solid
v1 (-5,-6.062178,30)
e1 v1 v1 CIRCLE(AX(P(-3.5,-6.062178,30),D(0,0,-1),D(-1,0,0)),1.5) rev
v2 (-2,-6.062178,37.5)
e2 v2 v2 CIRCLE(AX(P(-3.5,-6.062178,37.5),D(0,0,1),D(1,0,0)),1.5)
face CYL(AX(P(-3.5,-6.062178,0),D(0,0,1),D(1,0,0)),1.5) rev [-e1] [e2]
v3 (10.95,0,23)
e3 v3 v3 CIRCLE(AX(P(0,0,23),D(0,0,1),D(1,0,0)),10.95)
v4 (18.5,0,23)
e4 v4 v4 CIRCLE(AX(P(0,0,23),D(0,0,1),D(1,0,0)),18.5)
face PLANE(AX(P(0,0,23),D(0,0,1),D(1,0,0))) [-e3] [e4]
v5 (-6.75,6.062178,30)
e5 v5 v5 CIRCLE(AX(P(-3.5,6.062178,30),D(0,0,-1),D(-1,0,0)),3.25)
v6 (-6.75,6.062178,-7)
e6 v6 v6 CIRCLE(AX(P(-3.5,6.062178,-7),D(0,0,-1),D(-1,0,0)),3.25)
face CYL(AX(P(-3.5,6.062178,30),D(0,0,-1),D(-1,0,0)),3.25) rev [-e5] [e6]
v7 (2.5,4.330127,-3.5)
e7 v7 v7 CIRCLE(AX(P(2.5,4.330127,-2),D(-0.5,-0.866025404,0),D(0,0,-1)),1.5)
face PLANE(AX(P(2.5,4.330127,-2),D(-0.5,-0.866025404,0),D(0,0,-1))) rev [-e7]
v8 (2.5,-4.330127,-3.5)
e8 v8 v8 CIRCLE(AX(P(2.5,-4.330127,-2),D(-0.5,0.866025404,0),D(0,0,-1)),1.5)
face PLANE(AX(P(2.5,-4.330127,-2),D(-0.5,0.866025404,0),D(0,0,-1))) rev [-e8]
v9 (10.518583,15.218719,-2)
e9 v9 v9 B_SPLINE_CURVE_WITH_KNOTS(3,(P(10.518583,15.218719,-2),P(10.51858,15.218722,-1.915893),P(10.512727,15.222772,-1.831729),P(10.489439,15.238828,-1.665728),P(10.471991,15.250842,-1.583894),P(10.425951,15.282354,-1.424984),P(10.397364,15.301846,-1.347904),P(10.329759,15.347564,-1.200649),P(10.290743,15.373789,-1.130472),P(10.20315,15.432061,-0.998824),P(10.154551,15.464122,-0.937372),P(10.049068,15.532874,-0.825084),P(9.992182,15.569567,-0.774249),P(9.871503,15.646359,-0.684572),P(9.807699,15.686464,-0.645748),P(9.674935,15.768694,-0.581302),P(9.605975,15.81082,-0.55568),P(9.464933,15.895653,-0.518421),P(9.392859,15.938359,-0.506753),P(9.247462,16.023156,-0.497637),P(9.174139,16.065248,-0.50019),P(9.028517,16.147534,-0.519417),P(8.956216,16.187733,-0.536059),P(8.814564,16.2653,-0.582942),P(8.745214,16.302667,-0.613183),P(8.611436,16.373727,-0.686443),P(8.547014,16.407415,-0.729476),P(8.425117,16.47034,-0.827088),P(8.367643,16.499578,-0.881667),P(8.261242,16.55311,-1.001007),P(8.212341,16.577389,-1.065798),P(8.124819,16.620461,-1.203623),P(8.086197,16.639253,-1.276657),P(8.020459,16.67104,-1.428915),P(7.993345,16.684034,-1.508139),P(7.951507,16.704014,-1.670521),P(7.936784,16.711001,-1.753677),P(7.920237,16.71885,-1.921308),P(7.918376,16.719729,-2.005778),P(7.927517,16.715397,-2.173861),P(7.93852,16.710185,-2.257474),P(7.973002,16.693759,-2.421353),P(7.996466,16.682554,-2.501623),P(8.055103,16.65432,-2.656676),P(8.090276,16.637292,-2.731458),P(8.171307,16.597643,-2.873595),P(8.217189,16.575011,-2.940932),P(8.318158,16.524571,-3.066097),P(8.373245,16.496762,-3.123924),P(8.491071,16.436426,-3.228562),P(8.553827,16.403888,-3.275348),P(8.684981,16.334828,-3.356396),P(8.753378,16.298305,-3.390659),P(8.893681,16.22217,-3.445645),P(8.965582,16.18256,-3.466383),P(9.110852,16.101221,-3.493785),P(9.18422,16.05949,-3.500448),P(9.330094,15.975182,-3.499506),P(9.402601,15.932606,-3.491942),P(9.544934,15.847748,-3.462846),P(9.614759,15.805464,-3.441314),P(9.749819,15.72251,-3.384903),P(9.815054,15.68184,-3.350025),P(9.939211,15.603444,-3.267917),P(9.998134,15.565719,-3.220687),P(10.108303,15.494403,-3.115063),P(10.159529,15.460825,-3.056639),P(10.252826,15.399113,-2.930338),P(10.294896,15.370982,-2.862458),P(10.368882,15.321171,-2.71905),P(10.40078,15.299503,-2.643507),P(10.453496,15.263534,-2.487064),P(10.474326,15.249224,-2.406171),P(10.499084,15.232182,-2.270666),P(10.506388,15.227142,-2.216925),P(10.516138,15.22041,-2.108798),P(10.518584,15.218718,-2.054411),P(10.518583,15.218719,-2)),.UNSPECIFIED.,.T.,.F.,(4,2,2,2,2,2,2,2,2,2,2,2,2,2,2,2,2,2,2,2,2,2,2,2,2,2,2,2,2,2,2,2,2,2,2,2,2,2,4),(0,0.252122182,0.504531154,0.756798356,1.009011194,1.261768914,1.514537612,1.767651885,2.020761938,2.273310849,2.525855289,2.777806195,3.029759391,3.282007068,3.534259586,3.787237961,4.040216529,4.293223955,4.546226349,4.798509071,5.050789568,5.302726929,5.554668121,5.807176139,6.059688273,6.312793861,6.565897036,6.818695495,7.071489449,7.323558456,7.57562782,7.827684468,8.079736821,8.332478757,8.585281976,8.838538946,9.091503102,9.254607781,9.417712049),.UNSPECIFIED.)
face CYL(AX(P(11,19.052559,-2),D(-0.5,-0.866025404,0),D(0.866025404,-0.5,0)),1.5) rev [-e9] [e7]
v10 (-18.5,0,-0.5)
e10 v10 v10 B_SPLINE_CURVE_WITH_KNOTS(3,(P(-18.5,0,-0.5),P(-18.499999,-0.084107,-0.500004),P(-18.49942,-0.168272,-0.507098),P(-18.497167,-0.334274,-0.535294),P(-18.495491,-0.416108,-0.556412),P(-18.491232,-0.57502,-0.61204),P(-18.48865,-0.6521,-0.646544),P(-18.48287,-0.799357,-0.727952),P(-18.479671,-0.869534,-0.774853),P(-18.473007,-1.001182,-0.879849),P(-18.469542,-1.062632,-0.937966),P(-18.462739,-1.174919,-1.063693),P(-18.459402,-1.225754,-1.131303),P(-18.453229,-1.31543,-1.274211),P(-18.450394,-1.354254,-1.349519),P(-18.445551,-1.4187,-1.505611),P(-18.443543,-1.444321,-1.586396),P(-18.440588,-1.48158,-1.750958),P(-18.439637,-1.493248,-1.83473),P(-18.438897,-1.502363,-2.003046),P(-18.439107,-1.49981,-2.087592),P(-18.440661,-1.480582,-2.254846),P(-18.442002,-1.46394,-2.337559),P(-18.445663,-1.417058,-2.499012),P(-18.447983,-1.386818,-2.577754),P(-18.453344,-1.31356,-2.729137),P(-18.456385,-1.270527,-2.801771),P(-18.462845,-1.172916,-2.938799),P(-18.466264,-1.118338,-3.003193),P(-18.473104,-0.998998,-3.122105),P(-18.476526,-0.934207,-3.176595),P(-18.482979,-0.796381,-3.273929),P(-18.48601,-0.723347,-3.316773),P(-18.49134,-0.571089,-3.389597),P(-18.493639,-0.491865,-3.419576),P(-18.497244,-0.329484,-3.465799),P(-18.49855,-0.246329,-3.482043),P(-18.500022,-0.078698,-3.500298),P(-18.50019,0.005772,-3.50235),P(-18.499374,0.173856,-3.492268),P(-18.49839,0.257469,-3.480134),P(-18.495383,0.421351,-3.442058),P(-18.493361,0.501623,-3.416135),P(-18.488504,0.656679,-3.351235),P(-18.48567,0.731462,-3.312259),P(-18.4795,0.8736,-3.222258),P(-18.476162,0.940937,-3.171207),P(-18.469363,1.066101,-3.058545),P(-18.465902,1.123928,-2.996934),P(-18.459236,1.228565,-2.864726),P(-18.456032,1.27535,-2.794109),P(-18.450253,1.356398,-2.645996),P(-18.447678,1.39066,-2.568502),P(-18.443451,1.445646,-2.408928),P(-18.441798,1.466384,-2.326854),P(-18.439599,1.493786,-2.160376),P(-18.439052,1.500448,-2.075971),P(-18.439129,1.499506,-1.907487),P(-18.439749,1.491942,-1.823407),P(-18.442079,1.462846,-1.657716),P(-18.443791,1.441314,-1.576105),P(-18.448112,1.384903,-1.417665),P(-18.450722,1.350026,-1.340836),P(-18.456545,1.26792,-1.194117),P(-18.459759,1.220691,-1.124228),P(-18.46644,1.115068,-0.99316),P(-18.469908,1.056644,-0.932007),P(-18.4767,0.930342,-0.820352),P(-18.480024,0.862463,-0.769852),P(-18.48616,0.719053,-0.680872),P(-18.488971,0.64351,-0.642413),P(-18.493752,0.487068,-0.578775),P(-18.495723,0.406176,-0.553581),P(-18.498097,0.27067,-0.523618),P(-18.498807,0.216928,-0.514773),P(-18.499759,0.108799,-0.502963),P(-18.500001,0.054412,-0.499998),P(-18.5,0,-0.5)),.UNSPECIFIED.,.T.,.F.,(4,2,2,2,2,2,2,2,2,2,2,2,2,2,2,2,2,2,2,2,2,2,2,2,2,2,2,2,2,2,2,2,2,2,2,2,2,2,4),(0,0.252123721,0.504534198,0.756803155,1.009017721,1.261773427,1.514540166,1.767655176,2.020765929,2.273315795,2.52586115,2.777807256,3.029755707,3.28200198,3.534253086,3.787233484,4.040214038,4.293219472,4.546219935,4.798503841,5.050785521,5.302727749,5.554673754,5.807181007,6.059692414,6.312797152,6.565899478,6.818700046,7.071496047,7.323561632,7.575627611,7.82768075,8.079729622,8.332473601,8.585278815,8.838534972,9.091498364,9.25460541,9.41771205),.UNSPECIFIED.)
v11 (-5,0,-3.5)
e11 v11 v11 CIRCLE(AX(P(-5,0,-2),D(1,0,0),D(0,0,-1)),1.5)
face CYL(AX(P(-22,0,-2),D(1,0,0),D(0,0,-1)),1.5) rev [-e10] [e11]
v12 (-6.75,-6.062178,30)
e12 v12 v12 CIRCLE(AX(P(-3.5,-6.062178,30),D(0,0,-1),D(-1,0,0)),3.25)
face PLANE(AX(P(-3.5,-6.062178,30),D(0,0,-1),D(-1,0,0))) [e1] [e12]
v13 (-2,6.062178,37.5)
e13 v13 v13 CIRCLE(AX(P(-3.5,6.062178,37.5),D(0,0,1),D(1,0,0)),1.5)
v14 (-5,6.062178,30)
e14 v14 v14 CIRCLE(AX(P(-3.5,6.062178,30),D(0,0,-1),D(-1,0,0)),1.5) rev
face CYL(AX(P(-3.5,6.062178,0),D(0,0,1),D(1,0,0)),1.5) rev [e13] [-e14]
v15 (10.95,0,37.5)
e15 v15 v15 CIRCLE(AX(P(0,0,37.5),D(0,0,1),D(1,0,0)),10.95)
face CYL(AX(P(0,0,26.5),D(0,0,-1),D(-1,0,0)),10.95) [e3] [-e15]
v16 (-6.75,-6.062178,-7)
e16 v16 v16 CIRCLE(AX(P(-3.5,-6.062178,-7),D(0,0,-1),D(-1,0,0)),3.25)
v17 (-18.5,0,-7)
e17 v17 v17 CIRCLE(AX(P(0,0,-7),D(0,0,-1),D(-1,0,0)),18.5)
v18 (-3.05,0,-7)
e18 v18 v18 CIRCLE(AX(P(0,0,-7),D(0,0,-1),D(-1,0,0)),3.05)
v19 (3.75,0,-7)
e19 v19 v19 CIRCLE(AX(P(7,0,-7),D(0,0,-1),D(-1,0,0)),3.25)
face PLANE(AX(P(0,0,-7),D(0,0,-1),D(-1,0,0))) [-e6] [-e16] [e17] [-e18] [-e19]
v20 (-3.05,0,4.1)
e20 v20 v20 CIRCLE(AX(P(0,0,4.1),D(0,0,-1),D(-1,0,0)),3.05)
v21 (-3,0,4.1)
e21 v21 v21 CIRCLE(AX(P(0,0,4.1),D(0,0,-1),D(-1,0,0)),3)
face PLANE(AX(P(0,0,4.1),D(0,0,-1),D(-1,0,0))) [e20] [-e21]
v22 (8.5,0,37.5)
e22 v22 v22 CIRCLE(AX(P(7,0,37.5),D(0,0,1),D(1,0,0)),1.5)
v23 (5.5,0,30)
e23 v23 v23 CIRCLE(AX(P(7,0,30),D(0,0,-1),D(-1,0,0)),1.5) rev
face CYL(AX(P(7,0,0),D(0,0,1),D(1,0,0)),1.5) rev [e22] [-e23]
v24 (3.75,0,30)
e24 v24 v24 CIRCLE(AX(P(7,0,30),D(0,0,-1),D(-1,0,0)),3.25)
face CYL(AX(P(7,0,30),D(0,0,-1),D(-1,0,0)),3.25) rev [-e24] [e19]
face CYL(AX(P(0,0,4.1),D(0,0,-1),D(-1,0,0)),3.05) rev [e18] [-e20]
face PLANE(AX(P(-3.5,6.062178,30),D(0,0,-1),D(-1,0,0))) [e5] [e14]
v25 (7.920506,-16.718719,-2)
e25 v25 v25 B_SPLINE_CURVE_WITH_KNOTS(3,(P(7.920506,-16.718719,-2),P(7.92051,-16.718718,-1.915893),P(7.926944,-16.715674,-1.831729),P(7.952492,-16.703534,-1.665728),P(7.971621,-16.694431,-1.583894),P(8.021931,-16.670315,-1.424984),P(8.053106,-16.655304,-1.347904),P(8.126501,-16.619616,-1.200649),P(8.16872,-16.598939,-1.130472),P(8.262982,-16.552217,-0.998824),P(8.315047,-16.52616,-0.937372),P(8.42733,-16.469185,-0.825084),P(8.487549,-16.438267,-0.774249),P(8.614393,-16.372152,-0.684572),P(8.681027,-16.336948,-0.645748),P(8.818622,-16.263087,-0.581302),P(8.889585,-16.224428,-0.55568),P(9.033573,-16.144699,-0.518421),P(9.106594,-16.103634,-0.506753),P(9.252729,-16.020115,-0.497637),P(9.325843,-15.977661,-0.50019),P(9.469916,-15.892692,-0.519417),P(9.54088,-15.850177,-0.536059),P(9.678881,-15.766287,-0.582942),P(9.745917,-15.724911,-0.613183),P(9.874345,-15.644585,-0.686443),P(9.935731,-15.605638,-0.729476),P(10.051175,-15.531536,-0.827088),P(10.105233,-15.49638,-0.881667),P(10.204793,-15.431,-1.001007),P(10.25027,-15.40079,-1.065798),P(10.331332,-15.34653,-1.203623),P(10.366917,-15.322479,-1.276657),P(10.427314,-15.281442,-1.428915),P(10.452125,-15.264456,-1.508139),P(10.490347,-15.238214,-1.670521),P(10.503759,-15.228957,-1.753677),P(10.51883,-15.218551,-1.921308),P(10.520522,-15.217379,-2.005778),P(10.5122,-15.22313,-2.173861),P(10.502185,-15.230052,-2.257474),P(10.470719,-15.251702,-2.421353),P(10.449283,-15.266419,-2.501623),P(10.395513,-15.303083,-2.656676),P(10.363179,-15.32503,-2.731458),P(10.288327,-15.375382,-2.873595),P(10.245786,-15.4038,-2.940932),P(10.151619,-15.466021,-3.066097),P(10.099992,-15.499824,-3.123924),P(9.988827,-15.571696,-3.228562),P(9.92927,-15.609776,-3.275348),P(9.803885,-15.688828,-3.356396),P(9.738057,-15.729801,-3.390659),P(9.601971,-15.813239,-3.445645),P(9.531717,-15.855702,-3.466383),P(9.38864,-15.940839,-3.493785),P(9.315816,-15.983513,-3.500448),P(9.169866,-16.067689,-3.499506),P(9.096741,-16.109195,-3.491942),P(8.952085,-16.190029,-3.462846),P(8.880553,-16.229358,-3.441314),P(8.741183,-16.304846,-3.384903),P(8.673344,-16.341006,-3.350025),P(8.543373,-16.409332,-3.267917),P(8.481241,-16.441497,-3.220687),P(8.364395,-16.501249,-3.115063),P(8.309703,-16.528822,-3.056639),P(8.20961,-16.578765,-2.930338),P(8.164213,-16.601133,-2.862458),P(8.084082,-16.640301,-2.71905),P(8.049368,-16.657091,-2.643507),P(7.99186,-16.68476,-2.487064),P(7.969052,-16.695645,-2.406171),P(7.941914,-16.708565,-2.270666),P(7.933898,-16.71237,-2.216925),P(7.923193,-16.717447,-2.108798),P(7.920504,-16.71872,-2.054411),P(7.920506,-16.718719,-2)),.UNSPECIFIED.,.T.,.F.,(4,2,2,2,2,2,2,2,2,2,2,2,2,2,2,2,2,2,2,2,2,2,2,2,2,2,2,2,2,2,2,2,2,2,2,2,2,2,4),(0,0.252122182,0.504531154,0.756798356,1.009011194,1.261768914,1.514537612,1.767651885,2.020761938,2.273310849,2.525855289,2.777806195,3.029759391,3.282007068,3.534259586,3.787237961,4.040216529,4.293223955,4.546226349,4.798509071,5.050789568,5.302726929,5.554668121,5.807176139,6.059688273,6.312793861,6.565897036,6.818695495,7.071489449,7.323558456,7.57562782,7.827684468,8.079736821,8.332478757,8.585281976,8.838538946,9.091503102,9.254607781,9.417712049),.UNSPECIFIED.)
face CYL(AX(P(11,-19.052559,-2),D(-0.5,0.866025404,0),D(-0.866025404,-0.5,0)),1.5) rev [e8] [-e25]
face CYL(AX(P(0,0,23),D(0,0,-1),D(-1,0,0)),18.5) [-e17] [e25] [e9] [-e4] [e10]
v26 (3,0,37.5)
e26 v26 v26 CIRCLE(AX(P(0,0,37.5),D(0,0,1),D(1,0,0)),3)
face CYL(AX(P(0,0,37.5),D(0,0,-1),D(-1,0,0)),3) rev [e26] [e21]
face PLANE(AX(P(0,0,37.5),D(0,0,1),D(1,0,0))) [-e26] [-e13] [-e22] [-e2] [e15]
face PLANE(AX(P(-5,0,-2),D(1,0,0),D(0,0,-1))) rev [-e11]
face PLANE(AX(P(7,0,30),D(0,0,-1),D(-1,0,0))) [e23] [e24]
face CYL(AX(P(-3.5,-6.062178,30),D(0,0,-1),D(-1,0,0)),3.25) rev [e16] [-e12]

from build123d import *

# Parameters (mm, degrees)
SKETCH1_R           = 18.5
BOSS_EXTRUDE1_DEPTH = 23
SKETCH2_R           = 10.95
BOSS_EXTRUDE2_DEPTH = 3.5
SKETCH4_R           = 3.05
CUT_EXTRUDE1_DEPTH  = 4.1
SKETCH5_R           = 1.5
CUT_EXTRUDE2_DEPTH  = 4
SKETCH7_R           = 10.95
SKETCH7_R_2         = 3
BOSS_EXTRUDE3_DEPTH = 11
SKETCH9_R           = 1.5
CUT_EXTRUDE4_DEPTH  = 46.724719791
SKETCH10_R          = 3
CUT_EXTRUDE5_DEPTH  = 46.724719791
SKETCH11_R          = 3.25
CUT_EXTRUDE8_DEPTH  = 30
BOSS_EXTRUDE4_START = 7
SKETCH12_R          = 18.5
SKETCH12_R_2        = 3.25
SKETCH12_R_3        = 3.05
BOSS_EXTRUDE4_DEPTH = 7
CUT_EXTRUDE9_START  = -5
SKETCH13_R          = 1.5
CUT_EXTRUDE9_DEPTH  = 17
CIRPATTERN1_COUNT   = 3


with BuildPart() as part:
    # Sketch1 → Boss-Extrude1 (new body)
    with BuildSketch(Plane.XY):
        Circle(SKETCH1_R)
    extrude(amount=BOSS_EXTRUDE1_DEPTH)

    # Sketch2 → Boss-Extrude2 (add)
    with BuildSketch(Plane.XY.offset(23)):
        Circle(SKETCH2_R)
    extrude(amount=BOSS_EXTRUDE2_DEPTH)

    # Sketch4 → Cut-Extrude1 (cut)
    with BuildSketch(Plane(origin=(0, 0, 0), x_dir=(-1, 0, 0), z_dir=(0, 0, -1))):
        Circle(SKETCH4_R)
    extrude(amount=-CUT_EXTRUDE1_DEPTH, mode=Mode.SUBTRACT)

    # Sketch5 → Cut-Extrude2 (cut)
    with BuildSketch(Plane(origin=(0, 0, 4.1), x_dir=(-1, 0, 0), z_dir=(0, 0, -1))):
        Circle(SKETCH5_R)
    extrude(amount=-CUT_EXTRUDE2_DEPTH, mode=Mode.SUBTRACT)

    # Sketch7 → Boss-Extrude3 (add)
    with BuildSketch(Plane.XY.offset(26.5)):
        Circle(SKETCH7_R)
        Circle(SKETCH7_R_2, mode=Mode.SUBTRACT)
    extrude(amount=BOSS_EXTRUDE3_DEPTH)

    # Sketch9 → Cut-Extrude4 (cut, through all)
    with BuildSketch(Plane.XY.offset(37.5)):
        with Locations((7, 0)):
            Circle(SKETCH9_R)
        with Locations((-3.5, -6.062177826)):
            Circle(SKETCH9_R)
        with Locations((-3.5, 6.062177826)):
            Circle(SKETCH9_R)
    extrude(amount=-CUT_EXTRUDE4_DEPTH, mode=Mode.SUBTRACT)

    # Sketch10 → Cut-Extrude5 (cut, through all)
    with BuildSketch(Plane.XY.offset(37.5)):
        Circle(SKETCH10_R)
    extrude(amount=-CUT_EXTRUDE5_DEPTH, mode=Mode.SUBTRACT)

    # Sketch11 → Cut-Extrude8 (cut)
    with BuildSketch(Plane(origin=(0, 0, 0), x_dir=(-1, 0, 0), z_dir=(0, 0, -1))):
        with Locations((3.5, -6.062177826)):
            Circle(SKETCH11_R)
        with Locations((3.5, 6.062177826)):
            Circle(SKETCH11_R)
        with Locations((-7, 0)):
            Circle(SKETCH11_R)
    extrude(amount=-CUT_EXTRUDE8_DEPTH, mode=Mode.SUBTRACT)

    # Sketch12 → Boss-Extrude4 (add)
    with BuildSketch(Plane(origin=(0, 0, 0), x_dir=(-1, 0, 0), z_dir=(0, 0, -1)).offset(BOSS_EXTRUDE4_START)):
        Circle(SKETCH12_R)
        with Locations((3.5, 6.062177826)):
            Circle(SKETCH12_R_2, mode=Mode.SUBTRACT)
        with Locations((3.5, -6.062177826)):
            Circle(SKETCH12_R_2, mode=Mode.SUBTRACT)
        with Locations((-7, 0)):
            Circle(SKETCH12_R_2, mode=Mode.SUBTRACT)
        Circle(SKETCH12_R_3, mode=Mode.SUBTRACT)
    extrude(amount=-BOSS_EXTRUDE4_DEPTH)

    # Sketch13 → Cut-Extrude9 (cut)
    with BuildSketch(Plane(origin=(0, 0, 0), x_dir=(0, 0, -1), z_dir=(1, 0, 0)).offset(CUT_EXTRUDE9_START)):
        with Locations((2, 0)):
            Circle(SKETCH13_R)
    cut_extrude9 = extrude(amount=-CUT_EXTRUDE9_DEPTH, mode=Mode.SUBTRACT)

    # CirPattern1: Cut-Extrude9 ×3 about axis
    cirpattern1_axis = Axis((0, 0, 23), (0, 0, -1))
    for i in range(1, CIRPATTERN1_COUNT):
        add(cut_extrude9.rotate(cirpattern1_axis, i * 360 / CIRPATTERN1_COUNT), mode=Mode.SUBTRACT)


solid = part.part
